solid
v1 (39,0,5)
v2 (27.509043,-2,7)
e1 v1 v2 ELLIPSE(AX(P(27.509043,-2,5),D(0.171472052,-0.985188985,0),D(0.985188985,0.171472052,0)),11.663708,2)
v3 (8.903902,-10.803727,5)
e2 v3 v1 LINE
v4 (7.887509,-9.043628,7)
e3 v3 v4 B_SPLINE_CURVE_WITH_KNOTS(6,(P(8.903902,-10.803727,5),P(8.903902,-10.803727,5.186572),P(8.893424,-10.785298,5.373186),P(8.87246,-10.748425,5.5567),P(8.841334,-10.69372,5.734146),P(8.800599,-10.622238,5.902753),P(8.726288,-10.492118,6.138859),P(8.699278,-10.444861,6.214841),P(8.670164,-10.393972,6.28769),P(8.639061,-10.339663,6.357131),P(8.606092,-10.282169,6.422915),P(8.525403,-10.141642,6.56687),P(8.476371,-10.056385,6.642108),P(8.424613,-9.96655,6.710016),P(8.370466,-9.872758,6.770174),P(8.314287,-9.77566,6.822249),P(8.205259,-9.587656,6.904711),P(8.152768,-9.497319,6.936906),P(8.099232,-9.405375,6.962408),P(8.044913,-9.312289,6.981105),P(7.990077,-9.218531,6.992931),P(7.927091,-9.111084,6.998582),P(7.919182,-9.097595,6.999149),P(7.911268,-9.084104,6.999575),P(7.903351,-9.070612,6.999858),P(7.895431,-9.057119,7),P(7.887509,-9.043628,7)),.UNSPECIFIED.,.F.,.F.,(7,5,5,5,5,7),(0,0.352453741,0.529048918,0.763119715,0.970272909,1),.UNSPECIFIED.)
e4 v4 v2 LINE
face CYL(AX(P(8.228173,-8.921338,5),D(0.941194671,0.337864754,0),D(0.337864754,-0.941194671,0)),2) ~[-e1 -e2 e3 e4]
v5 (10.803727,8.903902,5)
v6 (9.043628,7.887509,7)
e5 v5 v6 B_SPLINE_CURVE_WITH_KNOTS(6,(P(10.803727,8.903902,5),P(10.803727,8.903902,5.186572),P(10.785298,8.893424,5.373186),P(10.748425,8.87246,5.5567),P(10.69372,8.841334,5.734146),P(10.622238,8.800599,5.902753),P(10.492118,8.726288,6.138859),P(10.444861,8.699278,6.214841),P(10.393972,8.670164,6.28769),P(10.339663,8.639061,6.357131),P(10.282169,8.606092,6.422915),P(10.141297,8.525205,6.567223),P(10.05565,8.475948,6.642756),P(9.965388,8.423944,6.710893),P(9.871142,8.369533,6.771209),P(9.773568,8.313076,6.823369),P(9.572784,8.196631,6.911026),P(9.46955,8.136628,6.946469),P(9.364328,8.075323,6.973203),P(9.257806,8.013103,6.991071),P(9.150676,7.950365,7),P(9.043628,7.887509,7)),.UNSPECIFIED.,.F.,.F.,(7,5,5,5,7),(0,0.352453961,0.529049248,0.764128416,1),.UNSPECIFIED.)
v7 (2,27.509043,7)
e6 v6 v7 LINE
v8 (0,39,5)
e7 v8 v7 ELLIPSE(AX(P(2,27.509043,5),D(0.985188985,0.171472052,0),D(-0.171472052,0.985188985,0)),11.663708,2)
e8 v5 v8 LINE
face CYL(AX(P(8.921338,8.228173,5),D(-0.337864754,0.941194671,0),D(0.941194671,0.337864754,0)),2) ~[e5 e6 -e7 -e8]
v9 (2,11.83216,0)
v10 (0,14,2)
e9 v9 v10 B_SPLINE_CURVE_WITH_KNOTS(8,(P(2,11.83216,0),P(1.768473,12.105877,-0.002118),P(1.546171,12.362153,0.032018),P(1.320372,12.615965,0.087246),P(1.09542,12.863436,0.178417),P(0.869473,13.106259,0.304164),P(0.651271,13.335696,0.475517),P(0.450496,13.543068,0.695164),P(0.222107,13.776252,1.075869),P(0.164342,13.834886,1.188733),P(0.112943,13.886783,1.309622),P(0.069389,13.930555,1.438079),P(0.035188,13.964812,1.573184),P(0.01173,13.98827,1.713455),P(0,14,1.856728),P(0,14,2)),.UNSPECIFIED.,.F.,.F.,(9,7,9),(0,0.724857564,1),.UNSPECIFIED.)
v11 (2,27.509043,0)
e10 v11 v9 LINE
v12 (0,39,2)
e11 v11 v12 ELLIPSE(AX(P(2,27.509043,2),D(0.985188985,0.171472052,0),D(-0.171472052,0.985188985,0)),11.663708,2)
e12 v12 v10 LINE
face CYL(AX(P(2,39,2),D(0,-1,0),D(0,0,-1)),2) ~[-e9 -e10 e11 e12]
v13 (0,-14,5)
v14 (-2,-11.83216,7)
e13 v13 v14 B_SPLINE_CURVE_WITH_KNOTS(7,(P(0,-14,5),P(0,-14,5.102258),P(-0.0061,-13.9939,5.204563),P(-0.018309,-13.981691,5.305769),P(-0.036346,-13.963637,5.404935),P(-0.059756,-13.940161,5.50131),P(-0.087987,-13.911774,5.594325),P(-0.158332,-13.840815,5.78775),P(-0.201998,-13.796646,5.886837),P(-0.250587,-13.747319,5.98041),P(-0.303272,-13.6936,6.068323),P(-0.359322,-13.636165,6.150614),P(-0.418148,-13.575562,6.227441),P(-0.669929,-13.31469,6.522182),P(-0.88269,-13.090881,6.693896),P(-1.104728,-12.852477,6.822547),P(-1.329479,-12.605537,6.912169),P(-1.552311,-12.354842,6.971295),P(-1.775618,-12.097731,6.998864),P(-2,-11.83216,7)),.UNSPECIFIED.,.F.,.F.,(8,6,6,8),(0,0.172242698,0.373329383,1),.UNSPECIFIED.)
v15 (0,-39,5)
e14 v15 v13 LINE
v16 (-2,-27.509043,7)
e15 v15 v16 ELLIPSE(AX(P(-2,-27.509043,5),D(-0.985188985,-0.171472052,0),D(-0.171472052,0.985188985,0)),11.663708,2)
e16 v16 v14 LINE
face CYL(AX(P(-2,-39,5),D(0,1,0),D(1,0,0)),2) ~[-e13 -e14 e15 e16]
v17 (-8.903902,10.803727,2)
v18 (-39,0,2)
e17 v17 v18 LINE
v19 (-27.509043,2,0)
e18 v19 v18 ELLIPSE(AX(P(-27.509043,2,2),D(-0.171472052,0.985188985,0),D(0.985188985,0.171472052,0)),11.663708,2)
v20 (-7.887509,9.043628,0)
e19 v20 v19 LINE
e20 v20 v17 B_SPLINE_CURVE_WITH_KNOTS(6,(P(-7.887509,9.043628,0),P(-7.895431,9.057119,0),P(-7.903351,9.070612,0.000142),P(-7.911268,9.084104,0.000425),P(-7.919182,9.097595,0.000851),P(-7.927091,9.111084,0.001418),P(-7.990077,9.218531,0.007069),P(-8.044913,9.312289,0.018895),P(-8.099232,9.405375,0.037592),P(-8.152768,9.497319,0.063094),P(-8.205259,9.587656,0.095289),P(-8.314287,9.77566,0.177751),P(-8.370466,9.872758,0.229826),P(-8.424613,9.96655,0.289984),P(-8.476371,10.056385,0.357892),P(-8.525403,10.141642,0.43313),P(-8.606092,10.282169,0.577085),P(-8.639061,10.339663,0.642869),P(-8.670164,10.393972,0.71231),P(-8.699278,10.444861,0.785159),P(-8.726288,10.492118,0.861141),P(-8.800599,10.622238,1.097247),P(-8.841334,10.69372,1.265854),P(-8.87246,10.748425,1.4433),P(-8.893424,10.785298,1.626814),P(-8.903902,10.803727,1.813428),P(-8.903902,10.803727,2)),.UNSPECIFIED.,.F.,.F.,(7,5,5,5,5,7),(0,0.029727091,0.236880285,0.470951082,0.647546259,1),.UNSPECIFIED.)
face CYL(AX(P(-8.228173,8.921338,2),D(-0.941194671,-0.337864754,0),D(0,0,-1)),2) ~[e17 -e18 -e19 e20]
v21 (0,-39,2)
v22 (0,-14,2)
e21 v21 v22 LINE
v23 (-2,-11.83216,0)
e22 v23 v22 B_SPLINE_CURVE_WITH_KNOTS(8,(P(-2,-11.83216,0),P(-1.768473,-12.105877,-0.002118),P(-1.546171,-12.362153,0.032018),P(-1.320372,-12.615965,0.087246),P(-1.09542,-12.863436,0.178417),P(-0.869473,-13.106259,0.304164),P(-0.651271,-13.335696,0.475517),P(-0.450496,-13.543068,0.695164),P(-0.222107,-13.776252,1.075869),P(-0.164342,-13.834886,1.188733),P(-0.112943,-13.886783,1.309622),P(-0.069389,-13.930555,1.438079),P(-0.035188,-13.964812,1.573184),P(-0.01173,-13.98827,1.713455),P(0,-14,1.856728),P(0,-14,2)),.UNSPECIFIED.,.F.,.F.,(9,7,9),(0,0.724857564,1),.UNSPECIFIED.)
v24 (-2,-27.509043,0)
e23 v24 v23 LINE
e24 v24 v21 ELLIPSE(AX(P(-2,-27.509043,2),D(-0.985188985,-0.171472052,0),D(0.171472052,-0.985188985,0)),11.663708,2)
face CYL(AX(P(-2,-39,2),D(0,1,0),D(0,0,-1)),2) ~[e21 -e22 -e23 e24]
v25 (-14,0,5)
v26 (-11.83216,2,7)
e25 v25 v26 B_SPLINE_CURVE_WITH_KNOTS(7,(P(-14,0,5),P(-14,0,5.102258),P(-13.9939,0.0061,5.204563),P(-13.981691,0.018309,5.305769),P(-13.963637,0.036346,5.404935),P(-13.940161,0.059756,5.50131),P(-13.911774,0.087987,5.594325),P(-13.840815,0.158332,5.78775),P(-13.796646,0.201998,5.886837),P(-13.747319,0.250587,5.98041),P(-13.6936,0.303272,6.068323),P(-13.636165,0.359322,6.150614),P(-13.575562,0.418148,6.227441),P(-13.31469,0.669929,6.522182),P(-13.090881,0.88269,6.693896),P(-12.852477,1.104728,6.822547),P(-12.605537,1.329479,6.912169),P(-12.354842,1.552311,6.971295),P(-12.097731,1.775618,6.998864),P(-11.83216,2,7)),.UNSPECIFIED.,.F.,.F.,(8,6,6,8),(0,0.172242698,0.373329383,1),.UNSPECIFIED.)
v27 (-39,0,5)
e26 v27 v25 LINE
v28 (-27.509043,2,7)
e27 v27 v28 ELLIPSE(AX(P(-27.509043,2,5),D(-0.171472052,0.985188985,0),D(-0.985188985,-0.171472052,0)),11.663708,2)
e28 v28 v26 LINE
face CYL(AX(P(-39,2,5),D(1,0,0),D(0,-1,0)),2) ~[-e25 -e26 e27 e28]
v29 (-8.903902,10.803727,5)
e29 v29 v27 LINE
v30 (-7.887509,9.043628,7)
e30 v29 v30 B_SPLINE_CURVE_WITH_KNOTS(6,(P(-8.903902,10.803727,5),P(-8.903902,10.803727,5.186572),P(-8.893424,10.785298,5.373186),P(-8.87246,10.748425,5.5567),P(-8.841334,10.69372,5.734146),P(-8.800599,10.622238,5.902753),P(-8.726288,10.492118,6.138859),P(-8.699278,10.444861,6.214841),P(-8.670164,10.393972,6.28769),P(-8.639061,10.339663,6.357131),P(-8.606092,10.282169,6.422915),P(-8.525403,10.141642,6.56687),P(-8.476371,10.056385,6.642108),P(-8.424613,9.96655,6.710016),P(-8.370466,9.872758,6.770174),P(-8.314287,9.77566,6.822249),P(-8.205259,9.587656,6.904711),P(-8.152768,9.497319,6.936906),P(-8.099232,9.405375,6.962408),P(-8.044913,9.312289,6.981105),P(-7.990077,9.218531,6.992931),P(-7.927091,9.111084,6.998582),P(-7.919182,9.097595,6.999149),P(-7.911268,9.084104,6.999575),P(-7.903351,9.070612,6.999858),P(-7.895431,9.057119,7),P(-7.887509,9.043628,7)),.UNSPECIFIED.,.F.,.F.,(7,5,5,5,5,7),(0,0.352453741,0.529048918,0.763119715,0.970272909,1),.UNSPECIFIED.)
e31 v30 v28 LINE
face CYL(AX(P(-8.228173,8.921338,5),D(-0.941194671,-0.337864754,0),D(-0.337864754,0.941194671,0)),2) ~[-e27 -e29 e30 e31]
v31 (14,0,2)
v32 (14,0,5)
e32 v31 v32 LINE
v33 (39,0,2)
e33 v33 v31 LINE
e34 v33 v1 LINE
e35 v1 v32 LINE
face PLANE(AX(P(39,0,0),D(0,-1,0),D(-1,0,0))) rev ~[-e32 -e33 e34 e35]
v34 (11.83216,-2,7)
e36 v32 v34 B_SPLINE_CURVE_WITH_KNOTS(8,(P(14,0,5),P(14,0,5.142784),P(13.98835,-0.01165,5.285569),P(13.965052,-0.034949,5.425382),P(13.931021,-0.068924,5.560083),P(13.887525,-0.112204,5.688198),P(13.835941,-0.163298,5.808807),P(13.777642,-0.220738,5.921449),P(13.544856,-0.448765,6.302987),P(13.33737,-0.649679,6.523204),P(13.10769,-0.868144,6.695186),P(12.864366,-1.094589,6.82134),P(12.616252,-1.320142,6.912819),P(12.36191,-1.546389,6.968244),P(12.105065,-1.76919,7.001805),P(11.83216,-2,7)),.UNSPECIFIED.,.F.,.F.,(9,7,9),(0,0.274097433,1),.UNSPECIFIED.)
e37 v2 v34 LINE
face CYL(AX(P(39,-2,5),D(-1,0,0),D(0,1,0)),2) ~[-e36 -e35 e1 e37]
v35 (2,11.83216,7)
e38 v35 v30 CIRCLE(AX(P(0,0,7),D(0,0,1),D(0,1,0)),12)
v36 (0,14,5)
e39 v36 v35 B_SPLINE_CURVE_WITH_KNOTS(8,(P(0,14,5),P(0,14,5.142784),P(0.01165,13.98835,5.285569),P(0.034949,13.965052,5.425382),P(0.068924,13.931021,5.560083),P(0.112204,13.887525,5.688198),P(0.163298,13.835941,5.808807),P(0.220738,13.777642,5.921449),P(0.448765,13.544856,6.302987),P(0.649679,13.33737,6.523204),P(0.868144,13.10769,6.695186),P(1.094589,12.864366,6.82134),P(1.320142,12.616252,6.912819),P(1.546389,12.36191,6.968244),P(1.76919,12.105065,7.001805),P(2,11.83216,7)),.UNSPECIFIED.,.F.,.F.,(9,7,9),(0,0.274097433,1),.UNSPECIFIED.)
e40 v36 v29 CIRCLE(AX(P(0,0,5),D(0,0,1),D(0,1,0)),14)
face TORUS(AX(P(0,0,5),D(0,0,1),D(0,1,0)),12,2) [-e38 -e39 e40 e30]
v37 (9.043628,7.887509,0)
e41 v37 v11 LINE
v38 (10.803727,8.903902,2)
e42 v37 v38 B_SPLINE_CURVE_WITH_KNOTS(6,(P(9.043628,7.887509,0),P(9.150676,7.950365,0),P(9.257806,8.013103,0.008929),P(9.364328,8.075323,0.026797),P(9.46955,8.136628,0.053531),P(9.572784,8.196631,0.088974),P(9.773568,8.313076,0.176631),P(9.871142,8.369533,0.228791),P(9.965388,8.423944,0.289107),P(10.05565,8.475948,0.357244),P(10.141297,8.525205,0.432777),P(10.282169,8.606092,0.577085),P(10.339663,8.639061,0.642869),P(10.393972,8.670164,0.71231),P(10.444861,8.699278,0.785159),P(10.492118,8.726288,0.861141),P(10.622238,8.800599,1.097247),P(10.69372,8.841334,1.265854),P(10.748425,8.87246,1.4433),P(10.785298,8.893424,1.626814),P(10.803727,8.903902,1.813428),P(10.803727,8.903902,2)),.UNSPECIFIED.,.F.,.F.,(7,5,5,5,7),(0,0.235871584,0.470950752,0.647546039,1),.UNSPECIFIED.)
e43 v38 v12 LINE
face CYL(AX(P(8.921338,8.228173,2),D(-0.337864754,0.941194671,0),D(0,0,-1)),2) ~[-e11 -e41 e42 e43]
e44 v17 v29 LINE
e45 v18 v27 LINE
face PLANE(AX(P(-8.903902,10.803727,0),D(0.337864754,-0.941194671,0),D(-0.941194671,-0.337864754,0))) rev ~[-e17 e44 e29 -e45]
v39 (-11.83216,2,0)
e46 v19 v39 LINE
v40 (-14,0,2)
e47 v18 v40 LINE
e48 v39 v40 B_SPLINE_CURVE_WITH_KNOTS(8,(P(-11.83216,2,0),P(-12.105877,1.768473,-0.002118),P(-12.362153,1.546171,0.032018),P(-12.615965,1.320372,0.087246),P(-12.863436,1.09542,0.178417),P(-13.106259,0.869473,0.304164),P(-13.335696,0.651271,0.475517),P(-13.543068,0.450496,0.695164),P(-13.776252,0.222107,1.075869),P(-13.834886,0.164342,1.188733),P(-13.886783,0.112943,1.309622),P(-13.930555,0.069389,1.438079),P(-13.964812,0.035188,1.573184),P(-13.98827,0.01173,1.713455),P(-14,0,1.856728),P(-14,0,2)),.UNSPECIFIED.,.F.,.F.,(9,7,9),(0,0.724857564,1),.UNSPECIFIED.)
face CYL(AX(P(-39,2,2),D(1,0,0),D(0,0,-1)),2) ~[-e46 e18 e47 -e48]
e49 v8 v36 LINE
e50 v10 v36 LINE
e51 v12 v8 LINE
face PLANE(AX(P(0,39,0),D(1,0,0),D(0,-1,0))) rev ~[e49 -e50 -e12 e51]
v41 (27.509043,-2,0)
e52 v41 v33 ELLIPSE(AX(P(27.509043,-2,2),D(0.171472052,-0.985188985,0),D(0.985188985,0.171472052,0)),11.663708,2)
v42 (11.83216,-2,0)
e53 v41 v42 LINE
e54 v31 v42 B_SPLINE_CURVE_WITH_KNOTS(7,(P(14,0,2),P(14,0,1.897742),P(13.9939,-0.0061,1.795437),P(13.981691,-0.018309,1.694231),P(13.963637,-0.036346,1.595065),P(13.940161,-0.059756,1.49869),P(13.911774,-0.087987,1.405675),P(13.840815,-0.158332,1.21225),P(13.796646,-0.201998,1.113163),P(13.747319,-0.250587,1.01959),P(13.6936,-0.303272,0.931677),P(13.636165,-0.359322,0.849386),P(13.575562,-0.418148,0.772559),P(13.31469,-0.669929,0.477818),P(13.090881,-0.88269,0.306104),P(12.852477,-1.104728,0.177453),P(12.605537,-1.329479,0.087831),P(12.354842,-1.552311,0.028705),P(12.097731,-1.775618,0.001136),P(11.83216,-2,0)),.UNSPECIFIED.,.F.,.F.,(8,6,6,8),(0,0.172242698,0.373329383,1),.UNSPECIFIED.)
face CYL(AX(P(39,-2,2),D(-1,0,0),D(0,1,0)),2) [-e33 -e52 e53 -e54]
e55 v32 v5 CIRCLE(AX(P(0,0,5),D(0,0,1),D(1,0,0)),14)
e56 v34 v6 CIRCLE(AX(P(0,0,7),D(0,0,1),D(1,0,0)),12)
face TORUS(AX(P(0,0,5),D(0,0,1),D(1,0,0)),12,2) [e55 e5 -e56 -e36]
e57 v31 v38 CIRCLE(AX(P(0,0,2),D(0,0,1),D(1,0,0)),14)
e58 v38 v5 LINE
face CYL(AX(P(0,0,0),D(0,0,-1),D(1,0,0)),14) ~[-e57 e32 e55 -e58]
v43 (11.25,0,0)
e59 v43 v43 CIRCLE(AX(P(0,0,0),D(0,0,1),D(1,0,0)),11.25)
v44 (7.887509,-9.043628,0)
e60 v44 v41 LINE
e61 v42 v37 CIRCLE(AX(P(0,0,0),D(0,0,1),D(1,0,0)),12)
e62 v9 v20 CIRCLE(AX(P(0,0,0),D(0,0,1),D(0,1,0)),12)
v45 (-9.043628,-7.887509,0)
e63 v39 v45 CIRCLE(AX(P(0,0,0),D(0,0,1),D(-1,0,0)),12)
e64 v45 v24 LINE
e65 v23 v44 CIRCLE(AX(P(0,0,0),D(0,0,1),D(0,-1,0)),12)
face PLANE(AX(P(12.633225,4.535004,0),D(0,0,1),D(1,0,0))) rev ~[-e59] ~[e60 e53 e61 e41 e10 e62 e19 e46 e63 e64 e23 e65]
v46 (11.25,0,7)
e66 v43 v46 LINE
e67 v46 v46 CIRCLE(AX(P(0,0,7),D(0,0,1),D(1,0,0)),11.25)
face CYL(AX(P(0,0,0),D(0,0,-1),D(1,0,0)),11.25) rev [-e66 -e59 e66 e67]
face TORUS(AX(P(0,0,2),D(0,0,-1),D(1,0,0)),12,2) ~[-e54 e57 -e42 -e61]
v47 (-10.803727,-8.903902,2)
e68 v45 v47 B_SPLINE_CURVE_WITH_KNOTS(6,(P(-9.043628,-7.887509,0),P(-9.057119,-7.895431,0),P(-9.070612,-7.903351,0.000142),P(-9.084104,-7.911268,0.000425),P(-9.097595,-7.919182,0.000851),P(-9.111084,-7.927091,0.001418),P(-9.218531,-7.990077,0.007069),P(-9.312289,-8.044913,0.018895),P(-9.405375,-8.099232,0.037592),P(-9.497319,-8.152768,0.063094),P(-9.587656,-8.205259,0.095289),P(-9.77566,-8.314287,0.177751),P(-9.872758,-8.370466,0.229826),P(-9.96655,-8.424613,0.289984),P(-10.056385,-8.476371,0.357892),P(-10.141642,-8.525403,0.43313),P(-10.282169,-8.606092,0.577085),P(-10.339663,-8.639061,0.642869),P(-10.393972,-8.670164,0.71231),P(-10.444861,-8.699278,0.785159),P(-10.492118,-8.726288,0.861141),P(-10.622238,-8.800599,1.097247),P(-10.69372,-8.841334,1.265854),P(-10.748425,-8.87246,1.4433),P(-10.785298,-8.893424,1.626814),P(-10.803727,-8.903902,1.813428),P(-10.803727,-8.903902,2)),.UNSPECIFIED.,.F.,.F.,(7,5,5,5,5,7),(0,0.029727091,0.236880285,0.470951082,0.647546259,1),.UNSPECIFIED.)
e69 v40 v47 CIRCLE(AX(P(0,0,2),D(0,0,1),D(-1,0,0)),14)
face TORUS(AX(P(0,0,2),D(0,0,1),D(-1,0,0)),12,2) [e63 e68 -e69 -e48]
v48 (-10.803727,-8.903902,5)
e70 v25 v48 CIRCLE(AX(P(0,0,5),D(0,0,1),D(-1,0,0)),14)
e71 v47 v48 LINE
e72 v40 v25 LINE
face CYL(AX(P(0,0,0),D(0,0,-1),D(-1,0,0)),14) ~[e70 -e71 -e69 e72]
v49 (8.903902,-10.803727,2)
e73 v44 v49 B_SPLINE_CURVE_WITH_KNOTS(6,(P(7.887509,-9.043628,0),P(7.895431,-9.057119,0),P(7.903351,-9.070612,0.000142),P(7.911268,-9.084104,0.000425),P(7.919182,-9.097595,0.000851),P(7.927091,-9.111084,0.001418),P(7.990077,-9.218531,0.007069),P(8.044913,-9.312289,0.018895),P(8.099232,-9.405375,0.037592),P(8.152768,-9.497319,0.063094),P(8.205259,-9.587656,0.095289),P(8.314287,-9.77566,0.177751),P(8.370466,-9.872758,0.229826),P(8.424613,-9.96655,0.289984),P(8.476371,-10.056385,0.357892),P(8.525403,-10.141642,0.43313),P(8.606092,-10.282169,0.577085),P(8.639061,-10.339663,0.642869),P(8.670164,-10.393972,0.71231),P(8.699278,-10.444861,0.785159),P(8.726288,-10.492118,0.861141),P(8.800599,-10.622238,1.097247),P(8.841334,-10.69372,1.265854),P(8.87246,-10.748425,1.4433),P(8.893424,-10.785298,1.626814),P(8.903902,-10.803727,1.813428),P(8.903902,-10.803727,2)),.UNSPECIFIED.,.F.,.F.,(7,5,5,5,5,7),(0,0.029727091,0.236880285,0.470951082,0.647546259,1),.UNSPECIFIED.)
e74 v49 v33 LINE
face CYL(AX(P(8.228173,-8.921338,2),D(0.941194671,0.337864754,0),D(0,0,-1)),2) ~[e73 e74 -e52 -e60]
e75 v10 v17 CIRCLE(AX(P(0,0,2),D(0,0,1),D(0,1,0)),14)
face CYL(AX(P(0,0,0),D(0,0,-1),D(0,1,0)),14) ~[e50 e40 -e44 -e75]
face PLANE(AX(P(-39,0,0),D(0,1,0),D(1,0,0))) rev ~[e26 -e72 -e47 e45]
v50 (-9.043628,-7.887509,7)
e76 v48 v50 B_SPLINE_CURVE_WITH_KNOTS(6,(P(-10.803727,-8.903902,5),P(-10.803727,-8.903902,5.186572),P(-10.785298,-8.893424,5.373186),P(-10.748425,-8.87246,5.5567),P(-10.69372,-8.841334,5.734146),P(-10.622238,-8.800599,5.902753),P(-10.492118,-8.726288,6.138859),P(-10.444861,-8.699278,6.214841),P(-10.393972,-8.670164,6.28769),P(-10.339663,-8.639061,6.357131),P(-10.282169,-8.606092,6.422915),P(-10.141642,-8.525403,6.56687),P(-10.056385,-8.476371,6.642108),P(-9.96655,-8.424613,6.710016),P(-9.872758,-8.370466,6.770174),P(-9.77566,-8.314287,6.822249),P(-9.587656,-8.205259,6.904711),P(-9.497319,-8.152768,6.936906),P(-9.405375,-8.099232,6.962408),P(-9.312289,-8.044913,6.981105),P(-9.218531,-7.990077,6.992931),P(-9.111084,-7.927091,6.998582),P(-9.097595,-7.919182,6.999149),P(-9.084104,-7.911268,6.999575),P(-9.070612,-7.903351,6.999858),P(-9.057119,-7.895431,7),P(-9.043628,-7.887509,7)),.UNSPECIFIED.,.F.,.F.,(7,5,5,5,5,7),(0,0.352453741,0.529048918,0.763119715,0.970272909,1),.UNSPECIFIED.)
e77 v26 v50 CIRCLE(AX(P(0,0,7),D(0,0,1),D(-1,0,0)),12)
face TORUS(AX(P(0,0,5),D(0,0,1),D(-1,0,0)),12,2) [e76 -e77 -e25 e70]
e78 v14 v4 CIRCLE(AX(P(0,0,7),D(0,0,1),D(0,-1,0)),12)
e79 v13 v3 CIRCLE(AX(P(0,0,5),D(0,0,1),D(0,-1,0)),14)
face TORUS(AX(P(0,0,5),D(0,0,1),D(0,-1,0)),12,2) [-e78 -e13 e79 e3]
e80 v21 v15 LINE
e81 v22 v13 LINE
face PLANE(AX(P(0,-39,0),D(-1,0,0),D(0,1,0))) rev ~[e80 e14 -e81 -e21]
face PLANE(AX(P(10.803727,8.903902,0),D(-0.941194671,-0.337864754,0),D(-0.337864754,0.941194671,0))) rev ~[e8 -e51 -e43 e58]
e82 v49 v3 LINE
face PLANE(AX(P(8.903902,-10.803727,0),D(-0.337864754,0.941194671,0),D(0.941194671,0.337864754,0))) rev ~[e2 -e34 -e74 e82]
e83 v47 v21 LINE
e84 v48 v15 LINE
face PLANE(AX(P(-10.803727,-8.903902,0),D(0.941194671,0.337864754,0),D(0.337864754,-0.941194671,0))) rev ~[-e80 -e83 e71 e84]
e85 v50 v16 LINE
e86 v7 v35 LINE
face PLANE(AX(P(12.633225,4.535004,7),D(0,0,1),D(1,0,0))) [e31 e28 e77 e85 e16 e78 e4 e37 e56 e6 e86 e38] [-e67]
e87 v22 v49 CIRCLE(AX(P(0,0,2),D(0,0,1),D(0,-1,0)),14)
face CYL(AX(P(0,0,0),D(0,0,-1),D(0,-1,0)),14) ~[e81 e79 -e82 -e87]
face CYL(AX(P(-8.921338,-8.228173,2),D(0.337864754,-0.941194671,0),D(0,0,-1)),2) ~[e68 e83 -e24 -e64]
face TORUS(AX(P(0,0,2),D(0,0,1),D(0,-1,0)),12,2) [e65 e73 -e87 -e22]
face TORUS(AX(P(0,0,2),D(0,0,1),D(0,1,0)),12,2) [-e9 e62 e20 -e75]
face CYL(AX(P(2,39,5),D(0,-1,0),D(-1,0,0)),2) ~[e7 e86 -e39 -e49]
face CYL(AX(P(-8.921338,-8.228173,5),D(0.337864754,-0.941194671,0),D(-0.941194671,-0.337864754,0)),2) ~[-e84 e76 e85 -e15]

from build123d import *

# Parameters (mm, degrees)
F0_R     = 11.25
F1_DEPTH = 7
F2_R     = 2
F3_R     = 2


with BuildPart() as f1:
    # F0 (on Top) → F1 (new body)
    with BuildSketch(Plane.XY):
        with BuildLine():
            Line((10.8037274316, 8.9039021549), (14, 0))
            ThreePointArc((14, 0), (13.1767253907, 4.7301065505), (10.8037274316, 8.9039021549))
        make_face()
        with BuildLine():
            Line((39, 0), (14, 0))
            ThreePointArc((14, 0), (12.6620422952, -5.97266146), (8.9039021549, -10.8037274316))
            Line((8.9039021549, -10.8037274316), (39, 0))
        make_face()
        with BuildLine():
            ThreePointArc((8.9039021549, -10.8037274316), (12.6620422952, -5.97266146), (14, 0))
            Line((14, 0), (10.8037274316, 8.9039021549))
            ThreePointArc((10.8037274316, 8.9039021549), (5.97266146, 12.6620422952), (0, 14))
            Line((0, 14), (-8.9039021549, 10.8037274316))
            ThreePointArc((-8.9039021549, 10.8037274316), (-12.6620422952, 5.97266146), (-14, 0))
            Line((-14, 0), (-10.8037274316, -8.9039021549))
            ThreePointArc((-10.8037274316, -8.9039021549), (-5.97266146, -12.6620422952), (0, -14))
            Line((0, -14), (8.9039021549, -10.8037274316))
        make_face()
        Circle(F0_R, mode=Mode.SUBTRACT)
        with BuildLine():
            ThreePointArc((0, 14), (5.97266146, 12.6620422952), (10.8037274316, 8.9039021549))
            Line((10.8037274316, 8.9039021549), (0, 39))
            Line((0, 39), (0, 14))
        make_face()
        with BuildLine():
            ThreePointArc((0, -14), (4.7301065505, -13.1767253907), (8.9039021549, -10.8037274316))
            Line((8.9039021549, -10.8037274316), (0, -14))
        make_face()
        with BuildLine():
            Line((-8.9039021549, 10.8037274316), (0, 14))
            ThreePointArc((0, 14), (-4.7301065505, 13.1767253907), (-8.9039021549, 10.8037274316))
        make_face()
        with BuildLine():
            Line((0, -39), (0, -14))
            ThreePointArc((0, -14), (-5.97266146, -12.6620422952), (-10.8037274316, -8.9039021549))
            Line((-10.8037274316, -8.9039021549), (0, -39))
        make_face()
        with BuildLine():
            ThreePointArc((-14, 0), (-12.6620422952, 5.97266146), (-8.9039021549, 10.8037274316))
            Line((-8.9039021549, 10.8037274316), (-39, 0))
            Line((-39, 0), (-14, 0))
        make_face()
        with BuildLine():
            ThreePointArc((-14, 0), (-13.1767253907, -4.7301065505), (-10.8037274316, -8.9039021549))
            Line((-10.8037274316, -8.9039021549), (-14, 0))
        make_face()
    extrude(amount=F1_DEPTH)

    # F2
    f2_edges = [f1.edges().sort_by_distance(p)[0] for p in [
        (0, -26.5, 7),
        (23.951951, -5.401864, 7),
        (5.401864, 23.951951, 7),
        (-23.951951, 5.401864, 7),
        (-26.5, 0, 7),
        (-5.401864, -23.951951, 7),
        (0, 26.5, 7),
        (13.176725, 4.730107, 7),
        (-4.730107, 13.176725, 7),
        (-13.176725, -4.730107, 7),
        (4.730107, -13.176725, 7),
        (26.5, 0, 7),
    ]]
    fillet(f2_edges, radius=F2_R)

    # F3
    f3_edges = [f1.edges().sort_by_distance(p)[0] for p in [
        (-26.5, 0, 0),
        (-5.401864, -23.951951, 0),
        (0, -26.5, 0),
        (23.951951, -5.401864, 0),
        (26.5, 0, 0),
        (5.401864, 23.951951, 0),
        (0, 26.5, 0),
        (-23.951951, 5.401864, 0),
        (4.730107, -13.176725, 0),
        (-13.176725, -4.730107, 0),
        (-4.730107, 13.176725, 0),
        (13.176725, 4.730107, 0),
    ]]
    fillet(f3_edges, radius=F3_R)


solid = f1.part
